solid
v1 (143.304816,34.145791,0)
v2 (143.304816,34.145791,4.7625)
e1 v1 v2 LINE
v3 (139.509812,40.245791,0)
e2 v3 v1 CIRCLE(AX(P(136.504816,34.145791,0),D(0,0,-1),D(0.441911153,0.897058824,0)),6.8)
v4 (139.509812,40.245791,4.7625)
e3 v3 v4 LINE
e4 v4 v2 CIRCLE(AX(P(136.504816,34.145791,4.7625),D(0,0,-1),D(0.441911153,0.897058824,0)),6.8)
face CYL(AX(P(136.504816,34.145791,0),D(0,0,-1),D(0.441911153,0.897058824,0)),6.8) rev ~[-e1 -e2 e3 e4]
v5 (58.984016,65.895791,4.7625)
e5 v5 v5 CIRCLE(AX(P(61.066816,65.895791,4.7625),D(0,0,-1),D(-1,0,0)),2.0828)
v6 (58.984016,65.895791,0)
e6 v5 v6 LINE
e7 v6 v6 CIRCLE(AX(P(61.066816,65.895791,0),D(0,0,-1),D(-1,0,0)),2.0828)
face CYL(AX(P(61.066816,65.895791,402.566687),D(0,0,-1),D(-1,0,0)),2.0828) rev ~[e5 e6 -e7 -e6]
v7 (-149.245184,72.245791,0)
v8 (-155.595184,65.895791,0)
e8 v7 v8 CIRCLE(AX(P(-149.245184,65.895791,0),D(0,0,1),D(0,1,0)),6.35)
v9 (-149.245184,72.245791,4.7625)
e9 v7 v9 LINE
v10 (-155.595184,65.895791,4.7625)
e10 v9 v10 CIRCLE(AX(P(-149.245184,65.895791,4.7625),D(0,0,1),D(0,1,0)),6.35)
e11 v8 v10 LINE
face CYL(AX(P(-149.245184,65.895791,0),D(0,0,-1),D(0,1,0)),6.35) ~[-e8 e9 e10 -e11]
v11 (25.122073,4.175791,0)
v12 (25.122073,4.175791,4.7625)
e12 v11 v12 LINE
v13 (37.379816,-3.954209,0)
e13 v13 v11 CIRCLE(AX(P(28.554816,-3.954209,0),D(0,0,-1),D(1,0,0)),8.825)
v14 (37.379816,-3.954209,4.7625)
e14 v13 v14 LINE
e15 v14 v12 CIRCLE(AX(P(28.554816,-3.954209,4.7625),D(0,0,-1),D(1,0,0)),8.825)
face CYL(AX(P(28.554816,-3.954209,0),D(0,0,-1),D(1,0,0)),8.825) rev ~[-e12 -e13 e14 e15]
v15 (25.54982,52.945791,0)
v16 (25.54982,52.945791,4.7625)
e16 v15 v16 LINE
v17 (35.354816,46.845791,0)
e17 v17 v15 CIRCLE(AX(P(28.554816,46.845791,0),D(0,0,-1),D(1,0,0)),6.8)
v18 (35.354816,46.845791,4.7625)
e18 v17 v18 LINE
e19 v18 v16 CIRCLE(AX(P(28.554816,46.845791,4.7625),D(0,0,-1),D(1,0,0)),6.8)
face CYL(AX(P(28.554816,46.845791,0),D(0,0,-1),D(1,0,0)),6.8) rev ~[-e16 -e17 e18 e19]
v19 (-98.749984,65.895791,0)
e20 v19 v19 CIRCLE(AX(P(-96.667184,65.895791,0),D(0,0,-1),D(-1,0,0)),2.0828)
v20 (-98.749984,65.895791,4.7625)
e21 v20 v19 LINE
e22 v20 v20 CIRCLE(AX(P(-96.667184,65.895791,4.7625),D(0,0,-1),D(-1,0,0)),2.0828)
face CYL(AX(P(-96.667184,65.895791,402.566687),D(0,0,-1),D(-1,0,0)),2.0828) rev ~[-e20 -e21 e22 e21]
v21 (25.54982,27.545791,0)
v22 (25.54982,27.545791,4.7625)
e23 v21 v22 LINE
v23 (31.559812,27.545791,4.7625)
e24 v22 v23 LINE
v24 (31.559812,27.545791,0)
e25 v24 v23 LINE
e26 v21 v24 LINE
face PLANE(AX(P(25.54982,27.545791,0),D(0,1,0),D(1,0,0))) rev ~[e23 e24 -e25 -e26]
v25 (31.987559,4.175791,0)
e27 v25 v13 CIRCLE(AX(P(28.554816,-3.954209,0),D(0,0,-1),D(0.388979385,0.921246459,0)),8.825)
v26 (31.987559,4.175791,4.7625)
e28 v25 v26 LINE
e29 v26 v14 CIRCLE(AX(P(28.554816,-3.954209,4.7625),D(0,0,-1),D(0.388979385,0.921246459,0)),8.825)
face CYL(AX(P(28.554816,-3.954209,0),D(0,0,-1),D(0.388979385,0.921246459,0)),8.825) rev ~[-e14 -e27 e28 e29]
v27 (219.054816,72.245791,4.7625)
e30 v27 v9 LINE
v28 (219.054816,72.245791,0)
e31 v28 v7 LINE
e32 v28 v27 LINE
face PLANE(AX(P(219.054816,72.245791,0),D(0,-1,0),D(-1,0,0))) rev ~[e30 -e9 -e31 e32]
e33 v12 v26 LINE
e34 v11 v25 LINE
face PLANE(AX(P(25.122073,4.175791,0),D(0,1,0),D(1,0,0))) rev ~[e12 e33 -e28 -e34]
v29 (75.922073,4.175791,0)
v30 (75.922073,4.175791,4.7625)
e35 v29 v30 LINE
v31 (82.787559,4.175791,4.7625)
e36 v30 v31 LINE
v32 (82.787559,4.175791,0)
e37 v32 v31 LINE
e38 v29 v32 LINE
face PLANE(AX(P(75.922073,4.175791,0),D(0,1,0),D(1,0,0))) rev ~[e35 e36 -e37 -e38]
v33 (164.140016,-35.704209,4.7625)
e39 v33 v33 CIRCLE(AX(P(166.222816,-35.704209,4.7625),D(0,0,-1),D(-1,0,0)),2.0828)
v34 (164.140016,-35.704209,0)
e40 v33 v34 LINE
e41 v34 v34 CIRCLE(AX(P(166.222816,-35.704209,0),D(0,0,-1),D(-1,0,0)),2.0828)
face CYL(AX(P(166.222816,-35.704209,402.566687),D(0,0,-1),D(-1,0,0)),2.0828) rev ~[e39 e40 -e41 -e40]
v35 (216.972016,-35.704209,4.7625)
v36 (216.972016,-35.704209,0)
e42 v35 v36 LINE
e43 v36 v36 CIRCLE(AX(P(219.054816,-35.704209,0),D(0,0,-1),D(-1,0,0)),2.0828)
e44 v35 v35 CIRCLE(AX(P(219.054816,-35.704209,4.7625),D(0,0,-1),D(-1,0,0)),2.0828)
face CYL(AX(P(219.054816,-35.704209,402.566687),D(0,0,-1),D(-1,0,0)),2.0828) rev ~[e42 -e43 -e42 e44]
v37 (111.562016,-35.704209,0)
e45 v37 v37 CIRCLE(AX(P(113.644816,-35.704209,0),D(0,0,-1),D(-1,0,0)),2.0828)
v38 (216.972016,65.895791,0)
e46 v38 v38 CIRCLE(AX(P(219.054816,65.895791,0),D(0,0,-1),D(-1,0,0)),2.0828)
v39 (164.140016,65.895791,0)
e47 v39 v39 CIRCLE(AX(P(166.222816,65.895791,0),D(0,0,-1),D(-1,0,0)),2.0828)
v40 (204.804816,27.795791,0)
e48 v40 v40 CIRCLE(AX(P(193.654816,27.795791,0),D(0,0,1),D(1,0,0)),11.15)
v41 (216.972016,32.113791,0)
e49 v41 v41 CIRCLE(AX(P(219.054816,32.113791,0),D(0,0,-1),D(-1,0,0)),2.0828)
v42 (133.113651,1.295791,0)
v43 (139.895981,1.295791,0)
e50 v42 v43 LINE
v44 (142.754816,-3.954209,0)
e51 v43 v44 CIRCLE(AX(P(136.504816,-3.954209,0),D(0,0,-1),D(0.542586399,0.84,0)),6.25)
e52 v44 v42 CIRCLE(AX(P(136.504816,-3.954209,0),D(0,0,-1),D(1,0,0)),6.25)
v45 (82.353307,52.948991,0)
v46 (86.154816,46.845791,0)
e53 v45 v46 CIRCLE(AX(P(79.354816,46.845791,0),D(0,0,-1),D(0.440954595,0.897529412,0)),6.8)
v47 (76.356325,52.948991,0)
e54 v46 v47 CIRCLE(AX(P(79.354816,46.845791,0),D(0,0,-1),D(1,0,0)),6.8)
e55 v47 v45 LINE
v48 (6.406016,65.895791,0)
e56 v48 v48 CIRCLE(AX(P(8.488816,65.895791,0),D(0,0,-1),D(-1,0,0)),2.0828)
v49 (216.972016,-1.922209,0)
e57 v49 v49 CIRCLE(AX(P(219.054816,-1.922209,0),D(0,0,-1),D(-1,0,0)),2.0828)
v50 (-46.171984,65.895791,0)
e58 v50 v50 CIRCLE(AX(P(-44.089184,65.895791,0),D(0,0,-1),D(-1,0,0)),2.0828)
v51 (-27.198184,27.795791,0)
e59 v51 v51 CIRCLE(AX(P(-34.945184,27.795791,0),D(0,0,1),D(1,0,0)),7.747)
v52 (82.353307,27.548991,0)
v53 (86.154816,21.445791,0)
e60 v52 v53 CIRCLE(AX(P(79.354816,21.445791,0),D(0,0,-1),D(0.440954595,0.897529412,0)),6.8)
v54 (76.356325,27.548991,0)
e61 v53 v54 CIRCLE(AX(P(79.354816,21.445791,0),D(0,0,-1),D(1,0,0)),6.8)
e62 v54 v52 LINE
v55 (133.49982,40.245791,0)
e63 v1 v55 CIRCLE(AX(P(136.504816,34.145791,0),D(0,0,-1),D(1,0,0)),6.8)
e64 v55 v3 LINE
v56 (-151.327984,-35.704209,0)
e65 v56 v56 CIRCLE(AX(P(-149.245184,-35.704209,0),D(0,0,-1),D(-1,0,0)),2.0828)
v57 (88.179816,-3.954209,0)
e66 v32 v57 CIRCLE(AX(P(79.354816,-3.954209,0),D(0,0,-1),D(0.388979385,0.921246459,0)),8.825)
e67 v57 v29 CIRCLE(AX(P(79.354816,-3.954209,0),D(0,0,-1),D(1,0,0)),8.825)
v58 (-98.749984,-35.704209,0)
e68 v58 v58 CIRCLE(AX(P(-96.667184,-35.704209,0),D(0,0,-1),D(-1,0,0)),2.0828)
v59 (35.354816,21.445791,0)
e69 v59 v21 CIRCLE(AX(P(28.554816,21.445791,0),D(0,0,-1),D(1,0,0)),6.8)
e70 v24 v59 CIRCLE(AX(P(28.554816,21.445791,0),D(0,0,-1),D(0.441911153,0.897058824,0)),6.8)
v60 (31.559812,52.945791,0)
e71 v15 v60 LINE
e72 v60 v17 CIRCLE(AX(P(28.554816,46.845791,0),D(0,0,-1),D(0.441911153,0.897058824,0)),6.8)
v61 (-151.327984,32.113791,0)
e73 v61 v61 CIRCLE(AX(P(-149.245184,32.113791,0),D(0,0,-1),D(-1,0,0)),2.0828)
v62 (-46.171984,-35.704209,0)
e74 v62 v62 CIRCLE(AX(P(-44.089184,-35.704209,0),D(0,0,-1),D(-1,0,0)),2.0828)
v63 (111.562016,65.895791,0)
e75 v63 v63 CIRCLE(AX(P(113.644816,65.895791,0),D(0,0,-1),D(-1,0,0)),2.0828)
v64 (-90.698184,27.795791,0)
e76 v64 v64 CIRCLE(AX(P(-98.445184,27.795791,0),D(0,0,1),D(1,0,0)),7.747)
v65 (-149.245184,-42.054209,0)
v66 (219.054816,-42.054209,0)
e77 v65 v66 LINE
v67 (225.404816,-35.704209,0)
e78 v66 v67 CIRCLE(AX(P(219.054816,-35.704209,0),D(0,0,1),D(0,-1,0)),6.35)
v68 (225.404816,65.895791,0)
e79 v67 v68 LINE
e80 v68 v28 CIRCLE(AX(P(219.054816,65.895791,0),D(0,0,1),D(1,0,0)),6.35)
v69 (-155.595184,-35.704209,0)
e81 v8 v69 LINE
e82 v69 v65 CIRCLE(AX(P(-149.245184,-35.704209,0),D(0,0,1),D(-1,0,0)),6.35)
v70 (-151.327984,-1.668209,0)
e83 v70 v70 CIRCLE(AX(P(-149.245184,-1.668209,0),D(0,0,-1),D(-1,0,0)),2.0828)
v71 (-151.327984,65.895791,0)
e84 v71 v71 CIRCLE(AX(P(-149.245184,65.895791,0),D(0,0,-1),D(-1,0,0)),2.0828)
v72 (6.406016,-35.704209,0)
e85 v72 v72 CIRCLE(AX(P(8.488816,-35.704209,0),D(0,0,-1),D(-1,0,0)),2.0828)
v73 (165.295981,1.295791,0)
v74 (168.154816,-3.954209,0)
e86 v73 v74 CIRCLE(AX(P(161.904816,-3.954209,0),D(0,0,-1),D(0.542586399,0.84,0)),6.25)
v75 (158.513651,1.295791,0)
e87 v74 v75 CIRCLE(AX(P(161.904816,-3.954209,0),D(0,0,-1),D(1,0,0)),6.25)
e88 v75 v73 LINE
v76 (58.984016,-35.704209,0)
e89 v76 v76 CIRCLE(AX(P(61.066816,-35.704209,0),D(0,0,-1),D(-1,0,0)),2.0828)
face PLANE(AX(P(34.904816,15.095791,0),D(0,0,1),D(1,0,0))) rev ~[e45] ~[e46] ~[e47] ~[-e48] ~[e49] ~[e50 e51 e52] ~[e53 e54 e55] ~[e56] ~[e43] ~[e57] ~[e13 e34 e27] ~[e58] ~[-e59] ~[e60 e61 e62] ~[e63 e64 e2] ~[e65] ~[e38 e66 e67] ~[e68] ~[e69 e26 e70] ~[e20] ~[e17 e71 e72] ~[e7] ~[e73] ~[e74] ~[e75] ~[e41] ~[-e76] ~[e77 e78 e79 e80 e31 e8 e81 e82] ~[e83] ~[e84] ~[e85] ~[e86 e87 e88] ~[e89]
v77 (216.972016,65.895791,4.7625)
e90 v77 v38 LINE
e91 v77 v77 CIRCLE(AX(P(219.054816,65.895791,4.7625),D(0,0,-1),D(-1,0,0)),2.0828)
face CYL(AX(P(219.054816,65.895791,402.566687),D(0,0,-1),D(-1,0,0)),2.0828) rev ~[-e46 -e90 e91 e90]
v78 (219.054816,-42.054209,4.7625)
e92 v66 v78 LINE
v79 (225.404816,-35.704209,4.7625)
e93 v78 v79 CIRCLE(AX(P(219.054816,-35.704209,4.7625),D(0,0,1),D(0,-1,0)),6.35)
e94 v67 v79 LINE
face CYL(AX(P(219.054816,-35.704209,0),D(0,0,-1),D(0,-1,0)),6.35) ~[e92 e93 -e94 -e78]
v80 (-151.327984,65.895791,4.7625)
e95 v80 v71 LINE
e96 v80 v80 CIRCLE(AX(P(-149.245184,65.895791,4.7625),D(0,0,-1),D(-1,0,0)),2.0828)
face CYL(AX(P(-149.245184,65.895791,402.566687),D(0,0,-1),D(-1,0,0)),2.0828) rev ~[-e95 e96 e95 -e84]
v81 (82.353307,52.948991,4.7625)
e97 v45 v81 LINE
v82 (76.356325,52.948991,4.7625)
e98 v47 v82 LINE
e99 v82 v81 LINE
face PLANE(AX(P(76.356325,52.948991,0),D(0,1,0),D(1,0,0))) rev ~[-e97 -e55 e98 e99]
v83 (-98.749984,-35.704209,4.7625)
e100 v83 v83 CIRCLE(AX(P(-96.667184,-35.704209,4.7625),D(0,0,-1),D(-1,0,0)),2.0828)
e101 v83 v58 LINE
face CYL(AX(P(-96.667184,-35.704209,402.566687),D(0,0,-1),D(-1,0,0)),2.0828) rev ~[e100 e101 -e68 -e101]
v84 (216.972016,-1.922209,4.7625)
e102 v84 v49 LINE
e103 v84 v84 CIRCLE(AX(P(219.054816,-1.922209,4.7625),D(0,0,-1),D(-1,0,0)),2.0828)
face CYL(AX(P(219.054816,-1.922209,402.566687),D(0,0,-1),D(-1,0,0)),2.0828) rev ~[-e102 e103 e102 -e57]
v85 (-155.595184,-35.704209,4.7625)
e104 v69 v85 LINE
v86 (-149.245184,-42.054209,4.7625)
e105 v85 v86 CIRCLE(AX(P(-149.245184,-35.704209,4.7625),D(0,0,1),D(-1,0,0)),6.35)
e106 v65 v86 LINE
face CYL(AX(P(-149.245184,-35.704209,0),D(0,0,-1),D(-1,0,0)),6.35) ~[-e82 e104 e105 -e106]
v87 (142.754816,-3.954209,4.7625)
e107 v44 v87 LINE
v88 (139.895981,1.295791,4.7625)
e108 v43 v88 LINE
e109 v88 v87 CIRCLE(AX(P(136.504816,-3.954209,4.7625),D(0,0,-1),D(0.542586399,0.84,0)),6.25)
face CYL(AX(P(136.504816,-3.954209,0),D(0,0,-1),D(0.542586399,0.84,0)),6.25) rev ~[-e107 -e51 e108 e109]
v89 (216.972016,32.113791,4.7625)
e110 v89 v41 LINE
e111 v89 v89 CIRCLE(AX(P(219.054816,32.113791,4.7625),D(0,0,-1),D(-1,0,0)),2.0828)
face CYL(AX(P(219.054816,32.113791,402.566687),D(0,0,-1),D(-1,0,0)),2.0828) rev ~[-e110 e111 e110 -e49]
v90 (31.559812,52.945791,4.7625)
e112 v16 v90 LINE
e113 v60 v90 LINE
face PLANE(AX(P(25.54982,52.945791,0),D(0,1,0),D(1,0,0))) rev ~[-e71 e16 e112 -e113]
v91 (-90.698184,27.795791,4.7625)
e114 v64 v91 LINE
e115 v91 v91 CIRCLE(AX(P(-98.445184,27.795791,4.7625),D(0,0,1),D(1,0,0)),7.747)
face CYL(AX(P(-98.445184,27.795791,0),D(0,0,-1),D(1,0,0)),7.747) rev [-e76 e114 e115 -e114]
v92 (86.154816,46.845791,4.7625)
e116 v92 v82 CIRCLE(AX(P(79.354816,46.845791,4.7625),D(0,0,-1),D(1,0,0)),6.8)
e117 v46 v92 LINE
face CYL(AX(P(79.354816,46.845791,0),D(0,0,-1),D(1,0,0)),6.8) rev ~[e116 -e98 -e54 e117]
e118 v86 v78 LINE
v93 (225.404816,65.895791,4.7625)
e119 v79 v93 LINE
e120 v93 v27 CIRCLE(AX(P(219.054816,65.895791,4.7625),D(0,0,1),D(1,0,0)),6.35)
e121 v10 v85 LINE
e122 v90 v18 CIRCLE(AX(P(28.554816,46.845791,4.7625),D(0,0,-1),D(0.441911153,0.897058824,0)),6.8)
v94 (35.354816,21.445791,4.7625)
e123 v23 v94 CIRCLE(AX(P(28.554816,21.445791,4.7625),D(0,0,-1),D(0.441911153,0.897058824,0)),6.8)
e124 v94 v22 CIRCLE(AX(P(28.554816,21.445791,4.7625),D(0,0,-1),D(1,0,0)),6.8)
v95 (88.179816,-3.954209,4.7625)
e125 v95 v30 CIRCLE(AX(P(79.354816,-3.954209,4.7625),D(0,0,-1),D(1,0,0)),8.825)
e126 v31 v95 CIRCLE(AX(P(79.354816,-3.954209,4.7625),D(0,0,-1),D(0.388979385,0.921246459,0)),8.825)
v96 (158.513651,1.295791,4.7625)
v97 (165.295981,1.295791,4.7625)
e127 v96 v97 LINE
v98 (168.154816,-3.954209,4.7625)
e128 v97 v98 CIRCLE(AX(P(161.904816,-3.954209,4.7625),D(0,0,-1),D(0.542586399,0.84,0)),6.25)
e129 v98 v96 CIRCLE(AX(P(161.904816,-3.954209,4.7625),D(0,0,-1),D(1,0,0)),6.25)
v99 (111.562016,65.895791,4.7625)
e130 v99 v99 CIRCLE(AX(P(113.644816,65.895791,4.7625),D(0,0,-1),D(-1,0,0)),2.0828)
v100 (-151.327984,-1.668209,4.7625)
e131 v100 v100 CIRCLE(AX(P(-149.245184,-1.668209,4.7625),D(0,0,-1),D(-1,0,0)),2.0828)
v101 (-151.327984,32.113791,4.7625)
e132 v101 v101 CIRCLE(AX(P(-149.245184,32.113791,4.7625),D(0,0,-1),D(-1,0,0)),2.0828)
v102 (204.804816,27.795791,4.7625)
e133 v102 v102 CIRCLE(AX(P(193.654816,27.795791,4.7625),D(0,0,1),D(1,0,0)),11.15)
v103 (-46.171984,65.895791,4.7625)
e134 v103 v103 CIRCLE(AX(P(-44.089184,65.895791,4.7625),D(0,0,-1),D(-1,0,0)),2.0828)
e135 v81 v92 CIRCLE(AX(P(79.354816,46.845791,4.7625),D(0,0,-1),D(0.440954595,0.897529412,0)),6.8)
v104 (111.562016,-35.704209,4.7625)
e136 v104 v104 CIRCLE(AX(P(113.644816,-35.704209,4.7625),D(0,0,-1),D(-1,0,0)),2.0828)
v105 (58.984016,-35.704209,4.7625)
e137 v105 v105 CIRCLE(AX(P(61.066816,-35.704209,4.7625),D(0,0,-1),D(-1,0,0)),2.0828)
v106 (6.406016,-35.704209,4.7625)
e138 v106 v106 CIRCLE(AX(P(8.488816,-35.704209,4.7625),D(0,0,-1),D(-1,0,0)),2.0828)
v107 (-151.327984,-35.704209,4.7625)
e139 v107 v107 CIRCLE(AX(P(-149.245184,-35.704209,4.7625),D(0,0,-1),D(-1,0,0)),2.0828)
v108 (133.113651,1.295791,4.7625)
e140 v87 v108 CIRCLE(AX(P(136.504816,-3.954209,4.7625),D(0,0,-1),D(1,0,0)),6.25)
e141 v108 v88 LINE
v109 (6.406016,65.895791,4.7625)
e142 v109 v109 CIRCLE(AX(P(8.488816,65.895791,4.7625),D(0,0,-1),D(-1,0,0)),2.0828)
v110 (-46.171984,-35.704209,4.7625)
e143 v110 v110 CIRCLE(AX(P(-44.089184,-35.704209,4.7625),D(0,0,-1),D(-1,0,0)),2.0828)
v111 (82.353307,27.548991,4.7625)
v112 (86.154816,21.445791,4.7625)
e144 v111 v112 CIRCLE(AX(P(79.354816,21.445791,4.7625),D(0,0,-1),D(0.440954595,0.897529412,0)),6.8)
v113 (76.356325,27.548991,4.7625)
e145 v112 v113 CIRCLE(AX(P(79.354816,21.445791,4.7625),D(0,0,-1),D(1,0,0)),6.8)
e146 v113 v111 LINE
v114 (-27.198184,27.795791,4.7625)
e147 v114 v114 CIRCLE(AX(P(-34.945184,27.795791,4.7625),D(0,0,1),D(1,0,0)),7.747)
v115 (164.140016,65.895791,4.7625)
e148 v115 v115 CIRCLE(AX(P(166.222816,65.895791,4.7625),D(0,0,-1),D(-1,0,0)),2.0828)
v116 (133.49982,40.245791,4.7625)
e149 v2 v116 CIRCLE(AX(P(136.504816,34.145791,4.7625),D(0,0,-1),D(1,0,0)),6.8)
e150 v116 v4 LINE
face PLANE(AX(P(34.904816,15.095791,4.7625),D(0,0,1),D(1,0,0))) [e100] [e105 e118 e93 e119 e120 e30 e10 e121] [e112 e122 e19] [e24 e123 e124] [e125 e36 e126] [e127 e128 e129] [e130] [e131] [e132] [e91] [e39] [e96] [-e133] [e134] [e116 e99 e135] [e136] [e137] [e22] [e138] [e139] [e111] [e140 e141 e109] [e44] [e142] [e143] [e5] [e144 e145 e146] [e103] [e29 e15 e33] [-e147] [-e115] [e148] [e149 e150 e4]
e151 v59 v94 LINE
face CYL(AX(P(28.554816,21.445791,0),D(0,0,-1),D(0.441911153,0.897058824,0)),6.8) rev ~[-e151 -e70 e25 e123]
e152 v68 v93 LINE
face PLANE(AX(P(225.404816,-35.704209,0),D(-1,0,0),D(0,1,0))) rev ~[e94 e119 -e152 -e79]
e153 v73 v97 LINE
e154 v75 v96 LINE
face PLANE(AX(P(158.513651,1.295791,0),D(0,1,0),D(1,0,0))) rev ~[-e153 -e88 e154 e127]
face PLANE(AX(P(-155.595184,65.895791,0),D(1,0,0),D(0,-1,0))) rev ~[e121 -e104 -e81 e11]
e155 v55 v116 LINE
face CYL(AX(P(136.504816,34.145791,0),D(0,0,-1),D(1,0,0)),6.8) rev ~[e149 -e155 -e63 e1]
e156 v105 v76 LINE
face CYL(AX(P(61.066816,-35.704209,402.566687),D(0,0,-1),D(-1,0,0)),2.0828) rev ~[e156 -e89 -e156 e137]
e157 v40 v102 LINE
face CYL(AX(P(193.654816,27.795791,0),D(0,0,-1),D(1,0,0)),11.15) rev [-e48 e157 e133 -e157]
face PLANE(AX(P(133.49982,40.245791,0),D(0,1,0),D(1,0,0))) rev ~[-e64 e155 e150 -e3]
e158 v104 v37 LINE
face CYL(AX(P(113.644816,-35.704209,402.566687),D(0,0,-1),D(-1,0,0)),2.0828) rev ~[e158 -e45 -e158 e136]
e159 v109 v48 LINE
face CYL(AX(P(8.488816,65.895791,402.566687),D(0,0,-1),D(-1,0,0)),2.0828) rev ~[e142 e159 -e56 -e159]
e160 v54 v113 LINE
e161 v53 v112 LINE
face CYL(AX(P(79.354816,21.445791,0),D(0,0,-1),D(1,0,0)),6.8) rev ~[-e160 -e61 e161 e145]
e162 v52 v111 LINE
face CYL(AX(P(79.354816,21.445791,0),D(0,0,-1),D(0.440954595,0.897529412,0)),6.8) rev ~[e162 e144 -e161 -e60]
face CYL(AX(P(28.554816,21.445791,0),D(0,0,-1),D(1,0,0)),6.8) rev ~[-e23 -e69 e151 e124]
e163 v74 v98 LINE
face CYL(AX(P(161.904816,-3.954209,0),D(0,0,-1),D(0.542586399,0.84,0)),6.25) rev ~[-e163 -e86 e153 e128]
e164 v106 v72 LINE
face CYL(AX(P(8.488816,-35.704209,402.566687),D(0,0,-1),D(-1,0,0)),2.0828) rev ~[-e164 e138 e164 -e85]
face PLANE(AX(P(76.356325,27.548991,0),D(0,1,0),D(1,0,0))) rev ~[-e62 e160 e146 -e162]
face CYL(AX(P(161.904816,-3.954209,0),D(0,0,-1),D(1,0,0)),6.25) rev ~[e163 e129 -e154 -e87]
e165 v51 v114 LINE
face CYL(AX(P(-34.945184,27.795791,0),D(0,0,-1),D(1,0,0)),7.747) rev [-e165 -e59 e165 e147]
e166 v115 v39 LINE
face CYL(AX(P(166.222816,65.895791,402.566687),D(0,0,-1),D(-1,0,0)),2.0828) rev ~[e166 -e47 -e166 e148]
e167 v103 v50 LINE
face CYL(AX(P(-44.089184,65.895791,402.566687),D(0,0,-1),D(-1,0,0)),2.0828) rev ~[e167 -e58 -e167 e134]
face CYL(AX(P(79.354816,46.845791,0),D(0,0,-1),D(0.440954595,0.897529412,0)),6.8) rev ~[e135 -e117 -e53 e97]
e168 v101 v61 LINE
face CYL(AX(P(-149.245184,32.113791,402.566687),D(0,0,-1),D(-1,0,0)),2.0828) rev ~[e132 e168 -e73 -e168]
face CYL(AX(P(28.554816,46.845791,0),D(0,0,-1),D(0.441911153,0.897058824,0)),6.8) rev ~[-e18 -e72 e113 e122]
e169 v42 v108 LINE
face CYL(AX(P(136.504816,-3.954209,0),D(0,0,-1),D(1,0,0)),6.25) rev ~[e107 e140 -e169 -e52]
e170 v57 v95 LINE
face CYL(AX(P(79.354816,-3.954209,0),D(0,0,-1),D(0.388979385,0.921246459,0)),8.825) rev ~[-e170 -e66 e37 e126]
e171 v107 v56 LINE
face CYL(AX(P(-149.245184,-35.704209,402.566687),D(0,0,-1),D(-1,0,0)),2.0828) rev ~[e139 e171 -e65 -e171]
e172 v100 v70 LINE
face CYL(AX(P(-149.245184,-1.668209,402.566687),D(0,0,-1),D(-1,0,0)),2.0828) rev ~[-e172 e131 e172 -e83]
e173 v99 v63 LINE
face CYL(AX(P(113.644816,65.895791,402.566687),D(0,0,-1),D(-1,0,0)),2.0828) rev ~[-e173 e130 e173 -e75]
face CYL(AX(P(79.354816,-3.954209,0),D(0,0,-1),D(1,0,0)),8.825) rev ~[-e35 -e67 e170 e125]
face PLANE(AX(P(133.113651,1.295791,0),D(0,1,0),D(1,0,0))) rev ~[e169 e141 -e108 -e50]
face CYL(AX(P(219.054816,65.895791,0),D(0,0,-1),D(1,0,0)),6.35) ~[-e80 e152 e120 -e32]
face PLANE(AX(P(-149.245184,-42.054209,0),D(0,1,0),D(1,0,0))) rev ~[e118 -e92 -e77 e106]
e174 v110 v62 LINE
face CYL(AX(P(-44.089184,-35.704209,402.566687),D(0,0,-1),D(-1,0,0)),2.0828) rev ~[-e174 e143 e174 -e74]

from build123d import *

# Parameters (mm, degrees)
F0_R     = 7.747
F0_R_2   = 11.15
F1_DEPTH = 4.7625
F3_D     = 4.1656


# Not quite as in the source:
# - a feature names something its author has since deleted; it is built from what else it names


with BuildPart() as f1:
    # F0 (on Top) → F1 (new body)
    with BuildSketch(Plane.XY):
        with BuildLine():
            Line((219.054815799, 72.2457910836), (-149.245184201, 72.2457910836))
            ThreePointArc((-149.245184201, 72.2457910836), (-153.7353122615, 70.3859191441), (-155.595184201, 65.8957910836))
            Line((-155.595184201, 65.8957910836), (-155.595184201, -35.7042089164))
            ThreePointArc((-155.595184201, -35.7042089164), (-153.7353122615, -40.194336977), (-149.245184201, -42.0542089164))
            Line((-149.245184201, -42.0542089164), (219.054815799, -42.0542089164))
            ThreePointArc((219.054815799, -42.0542089164), (223.5449438595, -40.194336977), (225.404815799, -35.7042089164))
            Line((225.404815799, -35.7042089164), (225.404815799, 65.8957910836))
            ThreePointArc((225.404815799, 65.8957910836), (223.5449438595, 70.3859191441), (219.054815799, 72.2457910836))
        make_face()
        with BuildLine():
            ThreePointArc((31.9875588712, 4.1757910836), (35.9092220501, 0.923632173), (37.379815799, -3.9542089164))
            ThreePointArc((37.379815799, -3.9542089164), (23.6769747096, -11.3086151675), (25.1220727268, 4.1757910836))
            ThreePointArc((25.1220727268, 4.1757910836), (28.554815799, 4.8707910836), (31.9875588712, 4.1757910836))
        make_face(mode=Mode.SUBTRACT)
        with BuildLine():
            ThreePointArc((82.7875588712, 4.1757910836), (86.7092220501, 0.923632173), (88.179815799, -3.9542089164))
            ThreePointArc((88.179815799, -3.9542089164), (74.4769747096, -11.3086151675), (75.9220727268, 4.1757910836))
            ThreePointArc((75.9220727268, 4.1757910836), (79.354815799, 4.8707910836), (82.7875588712, 4.1757910836))
        make_face(mode=Mode.SUBTRACT)
        with BuildLine():
            ThreePointArc((139.8959807906, 1.2957910836), (141.9937720385, -0.965252677), (142.754815799, -3.9542089164))
            ThreePointArc((142.754815799, -3.9542089164), (133.5158595595, -9.4431651559), (133.1136508074, 1.2957910836))
            ThreePointArc((133.1136508074, 1.2957910836), (136.504815799, 2.2957910836), (139.8959807906, 1.2957910836))
        make_face(mode=Mode.SUBTRACT)
        with BuildLine():
            ThreePointArc((165.2959807906, 1.2957910836), (167.3937720385, -0.965252677), (168.154815799, -3.9542089164))
            ThreePointArc((168.154815799, -3.9542089164), (158.9158595595, -9.4431651559), (158.5136508074, 1.2957910836))
            ThreePointArc((158.5136508074, 1.2957910836), (161.904815799, 2.2957910836), (165.2959807906, 1.2957910836))
        make_face(mode=Mode.SUBTRACT)
        with Locations((-98.445184201, 27.7957910836)):
            Circle(F0_R, mode=Mode.SUBTRACT)
        with Locations((-34.945184201, 27.7957910836)):
            Circle(F0_R, mode=Mode.SUBTRACT)
        with BuildLine():
            ThreePointArc((31.5598116393, 27.5457910836), (34.3286348, 25.0378676617), (35.354815799, 21.4457910836))
            ThreePointArc((35.354815799, 21.4457910836), (24.9627392209, 15.6719720825), (25.5498199587, 27.5457910836))
            ThreePointArc((25.5498199587, 27.5457910836), (28.554815799, 28.2457910836), (31.5598116393, 27.5457910836))
        make_face(mode=Mode.SUBTRACT)
        with BuildLine():
            ThreePointArc((31.5598116393, 52.9457910836), (34.3286348, 50.4378676617), (35.354815799, 46.8457910836))
            ThreePointArc((35.354815799, 46.8457910836), (24.9627392209, 41.0719720825), (25.5498199587, 52.9457910836))
            ThreePointArc((25.5498199587, 52.9457910836), (28.554815799, 53.6457910836), (31.5598116393, 52.9457910836))
        make_face(mode=Mode.SUBTRACT)
        with BuildLine():
            ThreePointArc((82.3533070463, 27.5489910836), (85.1267193187, 25.0409447325), (86.154815799, 21.4457910836))
            ThreePointArc((86.154815799, 21.4457910836), (75.7596621501, 15.6738875639), (76.3563245517, 27.5489910836))
            ThreePointArc((76.3563245517, 27.5489910836), (79.354815799, 28.2457910836), (82.3533070463, 27.5489910836))
        make_face(mode=Mode.SUBTRACT)
        with Locations((193.654815799, 27.7957910836)):
            Circle(F0_R_2, mode=Mode.SUBTRACT)
        with BuildLine():
            ThreePointArc((139.5098116393, 40.2457910836), (142.2786348, 37.7378676617), (143.304815799, 34.1457910836))
            ThreePointArc((143.304815799, 34.1457910836), (132.9127392209, 28.3719720825), (133.4998199587, 40.2457910836))
            ThreePointArc((133.4998199587, 40.2457910836), (136.504815799, 40.9457910836), (139.5098116393, 40.2457910836))
        make_face(mode=Mode.SUBTRACT)
        with BuildLine():
            ThreePointArc((82.3533070463, 52.9489910836), (85.1267193187, 50.4409447325), (86.154815799, 46.8457910836))
            ThreePointArc((86.154815799, 46.8457910836), (75.7596621501, 41.0738875639), (76.3563245517, 52.9489910836))
            ThreePointArc((76.3563245517, 52.9489910836), (79.354815799, 53.6457910836), (82.3533070463, 52.9489910836))
        make_face(mode=Mode.SUBTRACT)
        with BuildLine():
            Line((158.5136508074, 1.2957910836), (165.2959807906, 1.2957910836))
            ThreePointArc((165.2959807906, 1.2957910836), (161.904815799, 2.2957910836), (158.5136508074, 1.2957910836))
        make_face()
        with BuildLine():
            Line((133.1136508074, 1.2957910836), (139.8959807906, 1.2957910836))
            ThreePointArc((139.8959807906, 1.2957910836), (136.504815799, 2.2957910836), (133.1136508074, 1.2957910836))
        make_face()
        with BuildLine():
            Line((25.1220727268, 4.1757910836), (31.9875588712, 4.1757910836))
            ThreePointArc((31.9875588712, 4.1757910836), (28.554815799, 4.8707910836), (25.1220727268, 4.1757910836))
        make_face()
        with BuildLine():
            Line((75.9220727268, 4.1757910836), (82.7875588712, 4.1757910836))
            ThreePointArc((82.7875588712, 4.1757910836), (79.354815799, 4.8707910836), (75.9220727268, 4.1757910836))
        make_face()
        with BuildLine():
            Line((133.4998199587, 40.2457910836), (139.5098116393, 40.2457910836))
            ThreePointArc((139.5098116393, 40.2457910836), (136.504815799, 40.9457910836), (133.4998199587, 40.2457910836))
        make_face()
        with BuildLine():
            Line((25.5498199587, 52.9457910836), (31.5598116393, 52.9457910836))
            ThreePointArc((31.5598116393, 52.9457910836), (28.554815799, 53.6457910836), (25.5498199587, 52.9457910836))
        make_face()
        with BuildLine():
            Line((76.3563245517, 52.9489910836), (82.3533070463, 52.9489910836))
            ThreePointArc((82.3533070463, 52.9489910836), (79.354815799, 53.6457910836), (76.3563245517, 52.9489910836))
        make_face()
        with BuildLine():
            Line((76.3563245517, 27.5489910836), (82.3533070463, 27.5489910836))
            ThreePointArc((82.3533070463, 27.5489910836), (79.354815799, 28.2457910836), (76.3563245517, 27.5489910836))
        make_face()
        with BuildLine():
            Line((25.5498199587, 27.5457910836), (31.5598116393, 27.5457910836))
            ThreePointArc((31.5598116393, 27.5457910836), (28.554815799, 28.2457910836), (25.5498199587, 27.5457910836))
        make_face()
    extrude(amount=F1_DEPTH)

    # F3 (through all)
    with Locations(Plane.XY.offset(4.7625)):
        with Locations((-149.245184201, 65.8957910836), (-149.245184201, -35.7042089164), (219.054815799, 65.8957910836), (219.054815799, -35.7042089164), (-96.667184201, 65.8957910836), (113.644815799, 65.8957910836), (61.066815799, 65.8957910836), (166.222815799, 65.8957910836), (8.488815799, 65.8957910836), (-44.089184201, 65.8957910836), (-149.245184201, -1.6682089164), (-149.245184201, 32.1137910836), (61.066815799, -35.7042089164), (166.222815799, -35.7042089164), (-96.667184201, -35.7042089164), (-44.089184201, -35.7042089164), (113.644815799, -35.7042089164), (8.488815799, -35.7042089164), (219.054815799, -1.9222089164), (219.054815799, 32.1137910836)):
            Hole(F3_D / 2)


solid = f1.part
